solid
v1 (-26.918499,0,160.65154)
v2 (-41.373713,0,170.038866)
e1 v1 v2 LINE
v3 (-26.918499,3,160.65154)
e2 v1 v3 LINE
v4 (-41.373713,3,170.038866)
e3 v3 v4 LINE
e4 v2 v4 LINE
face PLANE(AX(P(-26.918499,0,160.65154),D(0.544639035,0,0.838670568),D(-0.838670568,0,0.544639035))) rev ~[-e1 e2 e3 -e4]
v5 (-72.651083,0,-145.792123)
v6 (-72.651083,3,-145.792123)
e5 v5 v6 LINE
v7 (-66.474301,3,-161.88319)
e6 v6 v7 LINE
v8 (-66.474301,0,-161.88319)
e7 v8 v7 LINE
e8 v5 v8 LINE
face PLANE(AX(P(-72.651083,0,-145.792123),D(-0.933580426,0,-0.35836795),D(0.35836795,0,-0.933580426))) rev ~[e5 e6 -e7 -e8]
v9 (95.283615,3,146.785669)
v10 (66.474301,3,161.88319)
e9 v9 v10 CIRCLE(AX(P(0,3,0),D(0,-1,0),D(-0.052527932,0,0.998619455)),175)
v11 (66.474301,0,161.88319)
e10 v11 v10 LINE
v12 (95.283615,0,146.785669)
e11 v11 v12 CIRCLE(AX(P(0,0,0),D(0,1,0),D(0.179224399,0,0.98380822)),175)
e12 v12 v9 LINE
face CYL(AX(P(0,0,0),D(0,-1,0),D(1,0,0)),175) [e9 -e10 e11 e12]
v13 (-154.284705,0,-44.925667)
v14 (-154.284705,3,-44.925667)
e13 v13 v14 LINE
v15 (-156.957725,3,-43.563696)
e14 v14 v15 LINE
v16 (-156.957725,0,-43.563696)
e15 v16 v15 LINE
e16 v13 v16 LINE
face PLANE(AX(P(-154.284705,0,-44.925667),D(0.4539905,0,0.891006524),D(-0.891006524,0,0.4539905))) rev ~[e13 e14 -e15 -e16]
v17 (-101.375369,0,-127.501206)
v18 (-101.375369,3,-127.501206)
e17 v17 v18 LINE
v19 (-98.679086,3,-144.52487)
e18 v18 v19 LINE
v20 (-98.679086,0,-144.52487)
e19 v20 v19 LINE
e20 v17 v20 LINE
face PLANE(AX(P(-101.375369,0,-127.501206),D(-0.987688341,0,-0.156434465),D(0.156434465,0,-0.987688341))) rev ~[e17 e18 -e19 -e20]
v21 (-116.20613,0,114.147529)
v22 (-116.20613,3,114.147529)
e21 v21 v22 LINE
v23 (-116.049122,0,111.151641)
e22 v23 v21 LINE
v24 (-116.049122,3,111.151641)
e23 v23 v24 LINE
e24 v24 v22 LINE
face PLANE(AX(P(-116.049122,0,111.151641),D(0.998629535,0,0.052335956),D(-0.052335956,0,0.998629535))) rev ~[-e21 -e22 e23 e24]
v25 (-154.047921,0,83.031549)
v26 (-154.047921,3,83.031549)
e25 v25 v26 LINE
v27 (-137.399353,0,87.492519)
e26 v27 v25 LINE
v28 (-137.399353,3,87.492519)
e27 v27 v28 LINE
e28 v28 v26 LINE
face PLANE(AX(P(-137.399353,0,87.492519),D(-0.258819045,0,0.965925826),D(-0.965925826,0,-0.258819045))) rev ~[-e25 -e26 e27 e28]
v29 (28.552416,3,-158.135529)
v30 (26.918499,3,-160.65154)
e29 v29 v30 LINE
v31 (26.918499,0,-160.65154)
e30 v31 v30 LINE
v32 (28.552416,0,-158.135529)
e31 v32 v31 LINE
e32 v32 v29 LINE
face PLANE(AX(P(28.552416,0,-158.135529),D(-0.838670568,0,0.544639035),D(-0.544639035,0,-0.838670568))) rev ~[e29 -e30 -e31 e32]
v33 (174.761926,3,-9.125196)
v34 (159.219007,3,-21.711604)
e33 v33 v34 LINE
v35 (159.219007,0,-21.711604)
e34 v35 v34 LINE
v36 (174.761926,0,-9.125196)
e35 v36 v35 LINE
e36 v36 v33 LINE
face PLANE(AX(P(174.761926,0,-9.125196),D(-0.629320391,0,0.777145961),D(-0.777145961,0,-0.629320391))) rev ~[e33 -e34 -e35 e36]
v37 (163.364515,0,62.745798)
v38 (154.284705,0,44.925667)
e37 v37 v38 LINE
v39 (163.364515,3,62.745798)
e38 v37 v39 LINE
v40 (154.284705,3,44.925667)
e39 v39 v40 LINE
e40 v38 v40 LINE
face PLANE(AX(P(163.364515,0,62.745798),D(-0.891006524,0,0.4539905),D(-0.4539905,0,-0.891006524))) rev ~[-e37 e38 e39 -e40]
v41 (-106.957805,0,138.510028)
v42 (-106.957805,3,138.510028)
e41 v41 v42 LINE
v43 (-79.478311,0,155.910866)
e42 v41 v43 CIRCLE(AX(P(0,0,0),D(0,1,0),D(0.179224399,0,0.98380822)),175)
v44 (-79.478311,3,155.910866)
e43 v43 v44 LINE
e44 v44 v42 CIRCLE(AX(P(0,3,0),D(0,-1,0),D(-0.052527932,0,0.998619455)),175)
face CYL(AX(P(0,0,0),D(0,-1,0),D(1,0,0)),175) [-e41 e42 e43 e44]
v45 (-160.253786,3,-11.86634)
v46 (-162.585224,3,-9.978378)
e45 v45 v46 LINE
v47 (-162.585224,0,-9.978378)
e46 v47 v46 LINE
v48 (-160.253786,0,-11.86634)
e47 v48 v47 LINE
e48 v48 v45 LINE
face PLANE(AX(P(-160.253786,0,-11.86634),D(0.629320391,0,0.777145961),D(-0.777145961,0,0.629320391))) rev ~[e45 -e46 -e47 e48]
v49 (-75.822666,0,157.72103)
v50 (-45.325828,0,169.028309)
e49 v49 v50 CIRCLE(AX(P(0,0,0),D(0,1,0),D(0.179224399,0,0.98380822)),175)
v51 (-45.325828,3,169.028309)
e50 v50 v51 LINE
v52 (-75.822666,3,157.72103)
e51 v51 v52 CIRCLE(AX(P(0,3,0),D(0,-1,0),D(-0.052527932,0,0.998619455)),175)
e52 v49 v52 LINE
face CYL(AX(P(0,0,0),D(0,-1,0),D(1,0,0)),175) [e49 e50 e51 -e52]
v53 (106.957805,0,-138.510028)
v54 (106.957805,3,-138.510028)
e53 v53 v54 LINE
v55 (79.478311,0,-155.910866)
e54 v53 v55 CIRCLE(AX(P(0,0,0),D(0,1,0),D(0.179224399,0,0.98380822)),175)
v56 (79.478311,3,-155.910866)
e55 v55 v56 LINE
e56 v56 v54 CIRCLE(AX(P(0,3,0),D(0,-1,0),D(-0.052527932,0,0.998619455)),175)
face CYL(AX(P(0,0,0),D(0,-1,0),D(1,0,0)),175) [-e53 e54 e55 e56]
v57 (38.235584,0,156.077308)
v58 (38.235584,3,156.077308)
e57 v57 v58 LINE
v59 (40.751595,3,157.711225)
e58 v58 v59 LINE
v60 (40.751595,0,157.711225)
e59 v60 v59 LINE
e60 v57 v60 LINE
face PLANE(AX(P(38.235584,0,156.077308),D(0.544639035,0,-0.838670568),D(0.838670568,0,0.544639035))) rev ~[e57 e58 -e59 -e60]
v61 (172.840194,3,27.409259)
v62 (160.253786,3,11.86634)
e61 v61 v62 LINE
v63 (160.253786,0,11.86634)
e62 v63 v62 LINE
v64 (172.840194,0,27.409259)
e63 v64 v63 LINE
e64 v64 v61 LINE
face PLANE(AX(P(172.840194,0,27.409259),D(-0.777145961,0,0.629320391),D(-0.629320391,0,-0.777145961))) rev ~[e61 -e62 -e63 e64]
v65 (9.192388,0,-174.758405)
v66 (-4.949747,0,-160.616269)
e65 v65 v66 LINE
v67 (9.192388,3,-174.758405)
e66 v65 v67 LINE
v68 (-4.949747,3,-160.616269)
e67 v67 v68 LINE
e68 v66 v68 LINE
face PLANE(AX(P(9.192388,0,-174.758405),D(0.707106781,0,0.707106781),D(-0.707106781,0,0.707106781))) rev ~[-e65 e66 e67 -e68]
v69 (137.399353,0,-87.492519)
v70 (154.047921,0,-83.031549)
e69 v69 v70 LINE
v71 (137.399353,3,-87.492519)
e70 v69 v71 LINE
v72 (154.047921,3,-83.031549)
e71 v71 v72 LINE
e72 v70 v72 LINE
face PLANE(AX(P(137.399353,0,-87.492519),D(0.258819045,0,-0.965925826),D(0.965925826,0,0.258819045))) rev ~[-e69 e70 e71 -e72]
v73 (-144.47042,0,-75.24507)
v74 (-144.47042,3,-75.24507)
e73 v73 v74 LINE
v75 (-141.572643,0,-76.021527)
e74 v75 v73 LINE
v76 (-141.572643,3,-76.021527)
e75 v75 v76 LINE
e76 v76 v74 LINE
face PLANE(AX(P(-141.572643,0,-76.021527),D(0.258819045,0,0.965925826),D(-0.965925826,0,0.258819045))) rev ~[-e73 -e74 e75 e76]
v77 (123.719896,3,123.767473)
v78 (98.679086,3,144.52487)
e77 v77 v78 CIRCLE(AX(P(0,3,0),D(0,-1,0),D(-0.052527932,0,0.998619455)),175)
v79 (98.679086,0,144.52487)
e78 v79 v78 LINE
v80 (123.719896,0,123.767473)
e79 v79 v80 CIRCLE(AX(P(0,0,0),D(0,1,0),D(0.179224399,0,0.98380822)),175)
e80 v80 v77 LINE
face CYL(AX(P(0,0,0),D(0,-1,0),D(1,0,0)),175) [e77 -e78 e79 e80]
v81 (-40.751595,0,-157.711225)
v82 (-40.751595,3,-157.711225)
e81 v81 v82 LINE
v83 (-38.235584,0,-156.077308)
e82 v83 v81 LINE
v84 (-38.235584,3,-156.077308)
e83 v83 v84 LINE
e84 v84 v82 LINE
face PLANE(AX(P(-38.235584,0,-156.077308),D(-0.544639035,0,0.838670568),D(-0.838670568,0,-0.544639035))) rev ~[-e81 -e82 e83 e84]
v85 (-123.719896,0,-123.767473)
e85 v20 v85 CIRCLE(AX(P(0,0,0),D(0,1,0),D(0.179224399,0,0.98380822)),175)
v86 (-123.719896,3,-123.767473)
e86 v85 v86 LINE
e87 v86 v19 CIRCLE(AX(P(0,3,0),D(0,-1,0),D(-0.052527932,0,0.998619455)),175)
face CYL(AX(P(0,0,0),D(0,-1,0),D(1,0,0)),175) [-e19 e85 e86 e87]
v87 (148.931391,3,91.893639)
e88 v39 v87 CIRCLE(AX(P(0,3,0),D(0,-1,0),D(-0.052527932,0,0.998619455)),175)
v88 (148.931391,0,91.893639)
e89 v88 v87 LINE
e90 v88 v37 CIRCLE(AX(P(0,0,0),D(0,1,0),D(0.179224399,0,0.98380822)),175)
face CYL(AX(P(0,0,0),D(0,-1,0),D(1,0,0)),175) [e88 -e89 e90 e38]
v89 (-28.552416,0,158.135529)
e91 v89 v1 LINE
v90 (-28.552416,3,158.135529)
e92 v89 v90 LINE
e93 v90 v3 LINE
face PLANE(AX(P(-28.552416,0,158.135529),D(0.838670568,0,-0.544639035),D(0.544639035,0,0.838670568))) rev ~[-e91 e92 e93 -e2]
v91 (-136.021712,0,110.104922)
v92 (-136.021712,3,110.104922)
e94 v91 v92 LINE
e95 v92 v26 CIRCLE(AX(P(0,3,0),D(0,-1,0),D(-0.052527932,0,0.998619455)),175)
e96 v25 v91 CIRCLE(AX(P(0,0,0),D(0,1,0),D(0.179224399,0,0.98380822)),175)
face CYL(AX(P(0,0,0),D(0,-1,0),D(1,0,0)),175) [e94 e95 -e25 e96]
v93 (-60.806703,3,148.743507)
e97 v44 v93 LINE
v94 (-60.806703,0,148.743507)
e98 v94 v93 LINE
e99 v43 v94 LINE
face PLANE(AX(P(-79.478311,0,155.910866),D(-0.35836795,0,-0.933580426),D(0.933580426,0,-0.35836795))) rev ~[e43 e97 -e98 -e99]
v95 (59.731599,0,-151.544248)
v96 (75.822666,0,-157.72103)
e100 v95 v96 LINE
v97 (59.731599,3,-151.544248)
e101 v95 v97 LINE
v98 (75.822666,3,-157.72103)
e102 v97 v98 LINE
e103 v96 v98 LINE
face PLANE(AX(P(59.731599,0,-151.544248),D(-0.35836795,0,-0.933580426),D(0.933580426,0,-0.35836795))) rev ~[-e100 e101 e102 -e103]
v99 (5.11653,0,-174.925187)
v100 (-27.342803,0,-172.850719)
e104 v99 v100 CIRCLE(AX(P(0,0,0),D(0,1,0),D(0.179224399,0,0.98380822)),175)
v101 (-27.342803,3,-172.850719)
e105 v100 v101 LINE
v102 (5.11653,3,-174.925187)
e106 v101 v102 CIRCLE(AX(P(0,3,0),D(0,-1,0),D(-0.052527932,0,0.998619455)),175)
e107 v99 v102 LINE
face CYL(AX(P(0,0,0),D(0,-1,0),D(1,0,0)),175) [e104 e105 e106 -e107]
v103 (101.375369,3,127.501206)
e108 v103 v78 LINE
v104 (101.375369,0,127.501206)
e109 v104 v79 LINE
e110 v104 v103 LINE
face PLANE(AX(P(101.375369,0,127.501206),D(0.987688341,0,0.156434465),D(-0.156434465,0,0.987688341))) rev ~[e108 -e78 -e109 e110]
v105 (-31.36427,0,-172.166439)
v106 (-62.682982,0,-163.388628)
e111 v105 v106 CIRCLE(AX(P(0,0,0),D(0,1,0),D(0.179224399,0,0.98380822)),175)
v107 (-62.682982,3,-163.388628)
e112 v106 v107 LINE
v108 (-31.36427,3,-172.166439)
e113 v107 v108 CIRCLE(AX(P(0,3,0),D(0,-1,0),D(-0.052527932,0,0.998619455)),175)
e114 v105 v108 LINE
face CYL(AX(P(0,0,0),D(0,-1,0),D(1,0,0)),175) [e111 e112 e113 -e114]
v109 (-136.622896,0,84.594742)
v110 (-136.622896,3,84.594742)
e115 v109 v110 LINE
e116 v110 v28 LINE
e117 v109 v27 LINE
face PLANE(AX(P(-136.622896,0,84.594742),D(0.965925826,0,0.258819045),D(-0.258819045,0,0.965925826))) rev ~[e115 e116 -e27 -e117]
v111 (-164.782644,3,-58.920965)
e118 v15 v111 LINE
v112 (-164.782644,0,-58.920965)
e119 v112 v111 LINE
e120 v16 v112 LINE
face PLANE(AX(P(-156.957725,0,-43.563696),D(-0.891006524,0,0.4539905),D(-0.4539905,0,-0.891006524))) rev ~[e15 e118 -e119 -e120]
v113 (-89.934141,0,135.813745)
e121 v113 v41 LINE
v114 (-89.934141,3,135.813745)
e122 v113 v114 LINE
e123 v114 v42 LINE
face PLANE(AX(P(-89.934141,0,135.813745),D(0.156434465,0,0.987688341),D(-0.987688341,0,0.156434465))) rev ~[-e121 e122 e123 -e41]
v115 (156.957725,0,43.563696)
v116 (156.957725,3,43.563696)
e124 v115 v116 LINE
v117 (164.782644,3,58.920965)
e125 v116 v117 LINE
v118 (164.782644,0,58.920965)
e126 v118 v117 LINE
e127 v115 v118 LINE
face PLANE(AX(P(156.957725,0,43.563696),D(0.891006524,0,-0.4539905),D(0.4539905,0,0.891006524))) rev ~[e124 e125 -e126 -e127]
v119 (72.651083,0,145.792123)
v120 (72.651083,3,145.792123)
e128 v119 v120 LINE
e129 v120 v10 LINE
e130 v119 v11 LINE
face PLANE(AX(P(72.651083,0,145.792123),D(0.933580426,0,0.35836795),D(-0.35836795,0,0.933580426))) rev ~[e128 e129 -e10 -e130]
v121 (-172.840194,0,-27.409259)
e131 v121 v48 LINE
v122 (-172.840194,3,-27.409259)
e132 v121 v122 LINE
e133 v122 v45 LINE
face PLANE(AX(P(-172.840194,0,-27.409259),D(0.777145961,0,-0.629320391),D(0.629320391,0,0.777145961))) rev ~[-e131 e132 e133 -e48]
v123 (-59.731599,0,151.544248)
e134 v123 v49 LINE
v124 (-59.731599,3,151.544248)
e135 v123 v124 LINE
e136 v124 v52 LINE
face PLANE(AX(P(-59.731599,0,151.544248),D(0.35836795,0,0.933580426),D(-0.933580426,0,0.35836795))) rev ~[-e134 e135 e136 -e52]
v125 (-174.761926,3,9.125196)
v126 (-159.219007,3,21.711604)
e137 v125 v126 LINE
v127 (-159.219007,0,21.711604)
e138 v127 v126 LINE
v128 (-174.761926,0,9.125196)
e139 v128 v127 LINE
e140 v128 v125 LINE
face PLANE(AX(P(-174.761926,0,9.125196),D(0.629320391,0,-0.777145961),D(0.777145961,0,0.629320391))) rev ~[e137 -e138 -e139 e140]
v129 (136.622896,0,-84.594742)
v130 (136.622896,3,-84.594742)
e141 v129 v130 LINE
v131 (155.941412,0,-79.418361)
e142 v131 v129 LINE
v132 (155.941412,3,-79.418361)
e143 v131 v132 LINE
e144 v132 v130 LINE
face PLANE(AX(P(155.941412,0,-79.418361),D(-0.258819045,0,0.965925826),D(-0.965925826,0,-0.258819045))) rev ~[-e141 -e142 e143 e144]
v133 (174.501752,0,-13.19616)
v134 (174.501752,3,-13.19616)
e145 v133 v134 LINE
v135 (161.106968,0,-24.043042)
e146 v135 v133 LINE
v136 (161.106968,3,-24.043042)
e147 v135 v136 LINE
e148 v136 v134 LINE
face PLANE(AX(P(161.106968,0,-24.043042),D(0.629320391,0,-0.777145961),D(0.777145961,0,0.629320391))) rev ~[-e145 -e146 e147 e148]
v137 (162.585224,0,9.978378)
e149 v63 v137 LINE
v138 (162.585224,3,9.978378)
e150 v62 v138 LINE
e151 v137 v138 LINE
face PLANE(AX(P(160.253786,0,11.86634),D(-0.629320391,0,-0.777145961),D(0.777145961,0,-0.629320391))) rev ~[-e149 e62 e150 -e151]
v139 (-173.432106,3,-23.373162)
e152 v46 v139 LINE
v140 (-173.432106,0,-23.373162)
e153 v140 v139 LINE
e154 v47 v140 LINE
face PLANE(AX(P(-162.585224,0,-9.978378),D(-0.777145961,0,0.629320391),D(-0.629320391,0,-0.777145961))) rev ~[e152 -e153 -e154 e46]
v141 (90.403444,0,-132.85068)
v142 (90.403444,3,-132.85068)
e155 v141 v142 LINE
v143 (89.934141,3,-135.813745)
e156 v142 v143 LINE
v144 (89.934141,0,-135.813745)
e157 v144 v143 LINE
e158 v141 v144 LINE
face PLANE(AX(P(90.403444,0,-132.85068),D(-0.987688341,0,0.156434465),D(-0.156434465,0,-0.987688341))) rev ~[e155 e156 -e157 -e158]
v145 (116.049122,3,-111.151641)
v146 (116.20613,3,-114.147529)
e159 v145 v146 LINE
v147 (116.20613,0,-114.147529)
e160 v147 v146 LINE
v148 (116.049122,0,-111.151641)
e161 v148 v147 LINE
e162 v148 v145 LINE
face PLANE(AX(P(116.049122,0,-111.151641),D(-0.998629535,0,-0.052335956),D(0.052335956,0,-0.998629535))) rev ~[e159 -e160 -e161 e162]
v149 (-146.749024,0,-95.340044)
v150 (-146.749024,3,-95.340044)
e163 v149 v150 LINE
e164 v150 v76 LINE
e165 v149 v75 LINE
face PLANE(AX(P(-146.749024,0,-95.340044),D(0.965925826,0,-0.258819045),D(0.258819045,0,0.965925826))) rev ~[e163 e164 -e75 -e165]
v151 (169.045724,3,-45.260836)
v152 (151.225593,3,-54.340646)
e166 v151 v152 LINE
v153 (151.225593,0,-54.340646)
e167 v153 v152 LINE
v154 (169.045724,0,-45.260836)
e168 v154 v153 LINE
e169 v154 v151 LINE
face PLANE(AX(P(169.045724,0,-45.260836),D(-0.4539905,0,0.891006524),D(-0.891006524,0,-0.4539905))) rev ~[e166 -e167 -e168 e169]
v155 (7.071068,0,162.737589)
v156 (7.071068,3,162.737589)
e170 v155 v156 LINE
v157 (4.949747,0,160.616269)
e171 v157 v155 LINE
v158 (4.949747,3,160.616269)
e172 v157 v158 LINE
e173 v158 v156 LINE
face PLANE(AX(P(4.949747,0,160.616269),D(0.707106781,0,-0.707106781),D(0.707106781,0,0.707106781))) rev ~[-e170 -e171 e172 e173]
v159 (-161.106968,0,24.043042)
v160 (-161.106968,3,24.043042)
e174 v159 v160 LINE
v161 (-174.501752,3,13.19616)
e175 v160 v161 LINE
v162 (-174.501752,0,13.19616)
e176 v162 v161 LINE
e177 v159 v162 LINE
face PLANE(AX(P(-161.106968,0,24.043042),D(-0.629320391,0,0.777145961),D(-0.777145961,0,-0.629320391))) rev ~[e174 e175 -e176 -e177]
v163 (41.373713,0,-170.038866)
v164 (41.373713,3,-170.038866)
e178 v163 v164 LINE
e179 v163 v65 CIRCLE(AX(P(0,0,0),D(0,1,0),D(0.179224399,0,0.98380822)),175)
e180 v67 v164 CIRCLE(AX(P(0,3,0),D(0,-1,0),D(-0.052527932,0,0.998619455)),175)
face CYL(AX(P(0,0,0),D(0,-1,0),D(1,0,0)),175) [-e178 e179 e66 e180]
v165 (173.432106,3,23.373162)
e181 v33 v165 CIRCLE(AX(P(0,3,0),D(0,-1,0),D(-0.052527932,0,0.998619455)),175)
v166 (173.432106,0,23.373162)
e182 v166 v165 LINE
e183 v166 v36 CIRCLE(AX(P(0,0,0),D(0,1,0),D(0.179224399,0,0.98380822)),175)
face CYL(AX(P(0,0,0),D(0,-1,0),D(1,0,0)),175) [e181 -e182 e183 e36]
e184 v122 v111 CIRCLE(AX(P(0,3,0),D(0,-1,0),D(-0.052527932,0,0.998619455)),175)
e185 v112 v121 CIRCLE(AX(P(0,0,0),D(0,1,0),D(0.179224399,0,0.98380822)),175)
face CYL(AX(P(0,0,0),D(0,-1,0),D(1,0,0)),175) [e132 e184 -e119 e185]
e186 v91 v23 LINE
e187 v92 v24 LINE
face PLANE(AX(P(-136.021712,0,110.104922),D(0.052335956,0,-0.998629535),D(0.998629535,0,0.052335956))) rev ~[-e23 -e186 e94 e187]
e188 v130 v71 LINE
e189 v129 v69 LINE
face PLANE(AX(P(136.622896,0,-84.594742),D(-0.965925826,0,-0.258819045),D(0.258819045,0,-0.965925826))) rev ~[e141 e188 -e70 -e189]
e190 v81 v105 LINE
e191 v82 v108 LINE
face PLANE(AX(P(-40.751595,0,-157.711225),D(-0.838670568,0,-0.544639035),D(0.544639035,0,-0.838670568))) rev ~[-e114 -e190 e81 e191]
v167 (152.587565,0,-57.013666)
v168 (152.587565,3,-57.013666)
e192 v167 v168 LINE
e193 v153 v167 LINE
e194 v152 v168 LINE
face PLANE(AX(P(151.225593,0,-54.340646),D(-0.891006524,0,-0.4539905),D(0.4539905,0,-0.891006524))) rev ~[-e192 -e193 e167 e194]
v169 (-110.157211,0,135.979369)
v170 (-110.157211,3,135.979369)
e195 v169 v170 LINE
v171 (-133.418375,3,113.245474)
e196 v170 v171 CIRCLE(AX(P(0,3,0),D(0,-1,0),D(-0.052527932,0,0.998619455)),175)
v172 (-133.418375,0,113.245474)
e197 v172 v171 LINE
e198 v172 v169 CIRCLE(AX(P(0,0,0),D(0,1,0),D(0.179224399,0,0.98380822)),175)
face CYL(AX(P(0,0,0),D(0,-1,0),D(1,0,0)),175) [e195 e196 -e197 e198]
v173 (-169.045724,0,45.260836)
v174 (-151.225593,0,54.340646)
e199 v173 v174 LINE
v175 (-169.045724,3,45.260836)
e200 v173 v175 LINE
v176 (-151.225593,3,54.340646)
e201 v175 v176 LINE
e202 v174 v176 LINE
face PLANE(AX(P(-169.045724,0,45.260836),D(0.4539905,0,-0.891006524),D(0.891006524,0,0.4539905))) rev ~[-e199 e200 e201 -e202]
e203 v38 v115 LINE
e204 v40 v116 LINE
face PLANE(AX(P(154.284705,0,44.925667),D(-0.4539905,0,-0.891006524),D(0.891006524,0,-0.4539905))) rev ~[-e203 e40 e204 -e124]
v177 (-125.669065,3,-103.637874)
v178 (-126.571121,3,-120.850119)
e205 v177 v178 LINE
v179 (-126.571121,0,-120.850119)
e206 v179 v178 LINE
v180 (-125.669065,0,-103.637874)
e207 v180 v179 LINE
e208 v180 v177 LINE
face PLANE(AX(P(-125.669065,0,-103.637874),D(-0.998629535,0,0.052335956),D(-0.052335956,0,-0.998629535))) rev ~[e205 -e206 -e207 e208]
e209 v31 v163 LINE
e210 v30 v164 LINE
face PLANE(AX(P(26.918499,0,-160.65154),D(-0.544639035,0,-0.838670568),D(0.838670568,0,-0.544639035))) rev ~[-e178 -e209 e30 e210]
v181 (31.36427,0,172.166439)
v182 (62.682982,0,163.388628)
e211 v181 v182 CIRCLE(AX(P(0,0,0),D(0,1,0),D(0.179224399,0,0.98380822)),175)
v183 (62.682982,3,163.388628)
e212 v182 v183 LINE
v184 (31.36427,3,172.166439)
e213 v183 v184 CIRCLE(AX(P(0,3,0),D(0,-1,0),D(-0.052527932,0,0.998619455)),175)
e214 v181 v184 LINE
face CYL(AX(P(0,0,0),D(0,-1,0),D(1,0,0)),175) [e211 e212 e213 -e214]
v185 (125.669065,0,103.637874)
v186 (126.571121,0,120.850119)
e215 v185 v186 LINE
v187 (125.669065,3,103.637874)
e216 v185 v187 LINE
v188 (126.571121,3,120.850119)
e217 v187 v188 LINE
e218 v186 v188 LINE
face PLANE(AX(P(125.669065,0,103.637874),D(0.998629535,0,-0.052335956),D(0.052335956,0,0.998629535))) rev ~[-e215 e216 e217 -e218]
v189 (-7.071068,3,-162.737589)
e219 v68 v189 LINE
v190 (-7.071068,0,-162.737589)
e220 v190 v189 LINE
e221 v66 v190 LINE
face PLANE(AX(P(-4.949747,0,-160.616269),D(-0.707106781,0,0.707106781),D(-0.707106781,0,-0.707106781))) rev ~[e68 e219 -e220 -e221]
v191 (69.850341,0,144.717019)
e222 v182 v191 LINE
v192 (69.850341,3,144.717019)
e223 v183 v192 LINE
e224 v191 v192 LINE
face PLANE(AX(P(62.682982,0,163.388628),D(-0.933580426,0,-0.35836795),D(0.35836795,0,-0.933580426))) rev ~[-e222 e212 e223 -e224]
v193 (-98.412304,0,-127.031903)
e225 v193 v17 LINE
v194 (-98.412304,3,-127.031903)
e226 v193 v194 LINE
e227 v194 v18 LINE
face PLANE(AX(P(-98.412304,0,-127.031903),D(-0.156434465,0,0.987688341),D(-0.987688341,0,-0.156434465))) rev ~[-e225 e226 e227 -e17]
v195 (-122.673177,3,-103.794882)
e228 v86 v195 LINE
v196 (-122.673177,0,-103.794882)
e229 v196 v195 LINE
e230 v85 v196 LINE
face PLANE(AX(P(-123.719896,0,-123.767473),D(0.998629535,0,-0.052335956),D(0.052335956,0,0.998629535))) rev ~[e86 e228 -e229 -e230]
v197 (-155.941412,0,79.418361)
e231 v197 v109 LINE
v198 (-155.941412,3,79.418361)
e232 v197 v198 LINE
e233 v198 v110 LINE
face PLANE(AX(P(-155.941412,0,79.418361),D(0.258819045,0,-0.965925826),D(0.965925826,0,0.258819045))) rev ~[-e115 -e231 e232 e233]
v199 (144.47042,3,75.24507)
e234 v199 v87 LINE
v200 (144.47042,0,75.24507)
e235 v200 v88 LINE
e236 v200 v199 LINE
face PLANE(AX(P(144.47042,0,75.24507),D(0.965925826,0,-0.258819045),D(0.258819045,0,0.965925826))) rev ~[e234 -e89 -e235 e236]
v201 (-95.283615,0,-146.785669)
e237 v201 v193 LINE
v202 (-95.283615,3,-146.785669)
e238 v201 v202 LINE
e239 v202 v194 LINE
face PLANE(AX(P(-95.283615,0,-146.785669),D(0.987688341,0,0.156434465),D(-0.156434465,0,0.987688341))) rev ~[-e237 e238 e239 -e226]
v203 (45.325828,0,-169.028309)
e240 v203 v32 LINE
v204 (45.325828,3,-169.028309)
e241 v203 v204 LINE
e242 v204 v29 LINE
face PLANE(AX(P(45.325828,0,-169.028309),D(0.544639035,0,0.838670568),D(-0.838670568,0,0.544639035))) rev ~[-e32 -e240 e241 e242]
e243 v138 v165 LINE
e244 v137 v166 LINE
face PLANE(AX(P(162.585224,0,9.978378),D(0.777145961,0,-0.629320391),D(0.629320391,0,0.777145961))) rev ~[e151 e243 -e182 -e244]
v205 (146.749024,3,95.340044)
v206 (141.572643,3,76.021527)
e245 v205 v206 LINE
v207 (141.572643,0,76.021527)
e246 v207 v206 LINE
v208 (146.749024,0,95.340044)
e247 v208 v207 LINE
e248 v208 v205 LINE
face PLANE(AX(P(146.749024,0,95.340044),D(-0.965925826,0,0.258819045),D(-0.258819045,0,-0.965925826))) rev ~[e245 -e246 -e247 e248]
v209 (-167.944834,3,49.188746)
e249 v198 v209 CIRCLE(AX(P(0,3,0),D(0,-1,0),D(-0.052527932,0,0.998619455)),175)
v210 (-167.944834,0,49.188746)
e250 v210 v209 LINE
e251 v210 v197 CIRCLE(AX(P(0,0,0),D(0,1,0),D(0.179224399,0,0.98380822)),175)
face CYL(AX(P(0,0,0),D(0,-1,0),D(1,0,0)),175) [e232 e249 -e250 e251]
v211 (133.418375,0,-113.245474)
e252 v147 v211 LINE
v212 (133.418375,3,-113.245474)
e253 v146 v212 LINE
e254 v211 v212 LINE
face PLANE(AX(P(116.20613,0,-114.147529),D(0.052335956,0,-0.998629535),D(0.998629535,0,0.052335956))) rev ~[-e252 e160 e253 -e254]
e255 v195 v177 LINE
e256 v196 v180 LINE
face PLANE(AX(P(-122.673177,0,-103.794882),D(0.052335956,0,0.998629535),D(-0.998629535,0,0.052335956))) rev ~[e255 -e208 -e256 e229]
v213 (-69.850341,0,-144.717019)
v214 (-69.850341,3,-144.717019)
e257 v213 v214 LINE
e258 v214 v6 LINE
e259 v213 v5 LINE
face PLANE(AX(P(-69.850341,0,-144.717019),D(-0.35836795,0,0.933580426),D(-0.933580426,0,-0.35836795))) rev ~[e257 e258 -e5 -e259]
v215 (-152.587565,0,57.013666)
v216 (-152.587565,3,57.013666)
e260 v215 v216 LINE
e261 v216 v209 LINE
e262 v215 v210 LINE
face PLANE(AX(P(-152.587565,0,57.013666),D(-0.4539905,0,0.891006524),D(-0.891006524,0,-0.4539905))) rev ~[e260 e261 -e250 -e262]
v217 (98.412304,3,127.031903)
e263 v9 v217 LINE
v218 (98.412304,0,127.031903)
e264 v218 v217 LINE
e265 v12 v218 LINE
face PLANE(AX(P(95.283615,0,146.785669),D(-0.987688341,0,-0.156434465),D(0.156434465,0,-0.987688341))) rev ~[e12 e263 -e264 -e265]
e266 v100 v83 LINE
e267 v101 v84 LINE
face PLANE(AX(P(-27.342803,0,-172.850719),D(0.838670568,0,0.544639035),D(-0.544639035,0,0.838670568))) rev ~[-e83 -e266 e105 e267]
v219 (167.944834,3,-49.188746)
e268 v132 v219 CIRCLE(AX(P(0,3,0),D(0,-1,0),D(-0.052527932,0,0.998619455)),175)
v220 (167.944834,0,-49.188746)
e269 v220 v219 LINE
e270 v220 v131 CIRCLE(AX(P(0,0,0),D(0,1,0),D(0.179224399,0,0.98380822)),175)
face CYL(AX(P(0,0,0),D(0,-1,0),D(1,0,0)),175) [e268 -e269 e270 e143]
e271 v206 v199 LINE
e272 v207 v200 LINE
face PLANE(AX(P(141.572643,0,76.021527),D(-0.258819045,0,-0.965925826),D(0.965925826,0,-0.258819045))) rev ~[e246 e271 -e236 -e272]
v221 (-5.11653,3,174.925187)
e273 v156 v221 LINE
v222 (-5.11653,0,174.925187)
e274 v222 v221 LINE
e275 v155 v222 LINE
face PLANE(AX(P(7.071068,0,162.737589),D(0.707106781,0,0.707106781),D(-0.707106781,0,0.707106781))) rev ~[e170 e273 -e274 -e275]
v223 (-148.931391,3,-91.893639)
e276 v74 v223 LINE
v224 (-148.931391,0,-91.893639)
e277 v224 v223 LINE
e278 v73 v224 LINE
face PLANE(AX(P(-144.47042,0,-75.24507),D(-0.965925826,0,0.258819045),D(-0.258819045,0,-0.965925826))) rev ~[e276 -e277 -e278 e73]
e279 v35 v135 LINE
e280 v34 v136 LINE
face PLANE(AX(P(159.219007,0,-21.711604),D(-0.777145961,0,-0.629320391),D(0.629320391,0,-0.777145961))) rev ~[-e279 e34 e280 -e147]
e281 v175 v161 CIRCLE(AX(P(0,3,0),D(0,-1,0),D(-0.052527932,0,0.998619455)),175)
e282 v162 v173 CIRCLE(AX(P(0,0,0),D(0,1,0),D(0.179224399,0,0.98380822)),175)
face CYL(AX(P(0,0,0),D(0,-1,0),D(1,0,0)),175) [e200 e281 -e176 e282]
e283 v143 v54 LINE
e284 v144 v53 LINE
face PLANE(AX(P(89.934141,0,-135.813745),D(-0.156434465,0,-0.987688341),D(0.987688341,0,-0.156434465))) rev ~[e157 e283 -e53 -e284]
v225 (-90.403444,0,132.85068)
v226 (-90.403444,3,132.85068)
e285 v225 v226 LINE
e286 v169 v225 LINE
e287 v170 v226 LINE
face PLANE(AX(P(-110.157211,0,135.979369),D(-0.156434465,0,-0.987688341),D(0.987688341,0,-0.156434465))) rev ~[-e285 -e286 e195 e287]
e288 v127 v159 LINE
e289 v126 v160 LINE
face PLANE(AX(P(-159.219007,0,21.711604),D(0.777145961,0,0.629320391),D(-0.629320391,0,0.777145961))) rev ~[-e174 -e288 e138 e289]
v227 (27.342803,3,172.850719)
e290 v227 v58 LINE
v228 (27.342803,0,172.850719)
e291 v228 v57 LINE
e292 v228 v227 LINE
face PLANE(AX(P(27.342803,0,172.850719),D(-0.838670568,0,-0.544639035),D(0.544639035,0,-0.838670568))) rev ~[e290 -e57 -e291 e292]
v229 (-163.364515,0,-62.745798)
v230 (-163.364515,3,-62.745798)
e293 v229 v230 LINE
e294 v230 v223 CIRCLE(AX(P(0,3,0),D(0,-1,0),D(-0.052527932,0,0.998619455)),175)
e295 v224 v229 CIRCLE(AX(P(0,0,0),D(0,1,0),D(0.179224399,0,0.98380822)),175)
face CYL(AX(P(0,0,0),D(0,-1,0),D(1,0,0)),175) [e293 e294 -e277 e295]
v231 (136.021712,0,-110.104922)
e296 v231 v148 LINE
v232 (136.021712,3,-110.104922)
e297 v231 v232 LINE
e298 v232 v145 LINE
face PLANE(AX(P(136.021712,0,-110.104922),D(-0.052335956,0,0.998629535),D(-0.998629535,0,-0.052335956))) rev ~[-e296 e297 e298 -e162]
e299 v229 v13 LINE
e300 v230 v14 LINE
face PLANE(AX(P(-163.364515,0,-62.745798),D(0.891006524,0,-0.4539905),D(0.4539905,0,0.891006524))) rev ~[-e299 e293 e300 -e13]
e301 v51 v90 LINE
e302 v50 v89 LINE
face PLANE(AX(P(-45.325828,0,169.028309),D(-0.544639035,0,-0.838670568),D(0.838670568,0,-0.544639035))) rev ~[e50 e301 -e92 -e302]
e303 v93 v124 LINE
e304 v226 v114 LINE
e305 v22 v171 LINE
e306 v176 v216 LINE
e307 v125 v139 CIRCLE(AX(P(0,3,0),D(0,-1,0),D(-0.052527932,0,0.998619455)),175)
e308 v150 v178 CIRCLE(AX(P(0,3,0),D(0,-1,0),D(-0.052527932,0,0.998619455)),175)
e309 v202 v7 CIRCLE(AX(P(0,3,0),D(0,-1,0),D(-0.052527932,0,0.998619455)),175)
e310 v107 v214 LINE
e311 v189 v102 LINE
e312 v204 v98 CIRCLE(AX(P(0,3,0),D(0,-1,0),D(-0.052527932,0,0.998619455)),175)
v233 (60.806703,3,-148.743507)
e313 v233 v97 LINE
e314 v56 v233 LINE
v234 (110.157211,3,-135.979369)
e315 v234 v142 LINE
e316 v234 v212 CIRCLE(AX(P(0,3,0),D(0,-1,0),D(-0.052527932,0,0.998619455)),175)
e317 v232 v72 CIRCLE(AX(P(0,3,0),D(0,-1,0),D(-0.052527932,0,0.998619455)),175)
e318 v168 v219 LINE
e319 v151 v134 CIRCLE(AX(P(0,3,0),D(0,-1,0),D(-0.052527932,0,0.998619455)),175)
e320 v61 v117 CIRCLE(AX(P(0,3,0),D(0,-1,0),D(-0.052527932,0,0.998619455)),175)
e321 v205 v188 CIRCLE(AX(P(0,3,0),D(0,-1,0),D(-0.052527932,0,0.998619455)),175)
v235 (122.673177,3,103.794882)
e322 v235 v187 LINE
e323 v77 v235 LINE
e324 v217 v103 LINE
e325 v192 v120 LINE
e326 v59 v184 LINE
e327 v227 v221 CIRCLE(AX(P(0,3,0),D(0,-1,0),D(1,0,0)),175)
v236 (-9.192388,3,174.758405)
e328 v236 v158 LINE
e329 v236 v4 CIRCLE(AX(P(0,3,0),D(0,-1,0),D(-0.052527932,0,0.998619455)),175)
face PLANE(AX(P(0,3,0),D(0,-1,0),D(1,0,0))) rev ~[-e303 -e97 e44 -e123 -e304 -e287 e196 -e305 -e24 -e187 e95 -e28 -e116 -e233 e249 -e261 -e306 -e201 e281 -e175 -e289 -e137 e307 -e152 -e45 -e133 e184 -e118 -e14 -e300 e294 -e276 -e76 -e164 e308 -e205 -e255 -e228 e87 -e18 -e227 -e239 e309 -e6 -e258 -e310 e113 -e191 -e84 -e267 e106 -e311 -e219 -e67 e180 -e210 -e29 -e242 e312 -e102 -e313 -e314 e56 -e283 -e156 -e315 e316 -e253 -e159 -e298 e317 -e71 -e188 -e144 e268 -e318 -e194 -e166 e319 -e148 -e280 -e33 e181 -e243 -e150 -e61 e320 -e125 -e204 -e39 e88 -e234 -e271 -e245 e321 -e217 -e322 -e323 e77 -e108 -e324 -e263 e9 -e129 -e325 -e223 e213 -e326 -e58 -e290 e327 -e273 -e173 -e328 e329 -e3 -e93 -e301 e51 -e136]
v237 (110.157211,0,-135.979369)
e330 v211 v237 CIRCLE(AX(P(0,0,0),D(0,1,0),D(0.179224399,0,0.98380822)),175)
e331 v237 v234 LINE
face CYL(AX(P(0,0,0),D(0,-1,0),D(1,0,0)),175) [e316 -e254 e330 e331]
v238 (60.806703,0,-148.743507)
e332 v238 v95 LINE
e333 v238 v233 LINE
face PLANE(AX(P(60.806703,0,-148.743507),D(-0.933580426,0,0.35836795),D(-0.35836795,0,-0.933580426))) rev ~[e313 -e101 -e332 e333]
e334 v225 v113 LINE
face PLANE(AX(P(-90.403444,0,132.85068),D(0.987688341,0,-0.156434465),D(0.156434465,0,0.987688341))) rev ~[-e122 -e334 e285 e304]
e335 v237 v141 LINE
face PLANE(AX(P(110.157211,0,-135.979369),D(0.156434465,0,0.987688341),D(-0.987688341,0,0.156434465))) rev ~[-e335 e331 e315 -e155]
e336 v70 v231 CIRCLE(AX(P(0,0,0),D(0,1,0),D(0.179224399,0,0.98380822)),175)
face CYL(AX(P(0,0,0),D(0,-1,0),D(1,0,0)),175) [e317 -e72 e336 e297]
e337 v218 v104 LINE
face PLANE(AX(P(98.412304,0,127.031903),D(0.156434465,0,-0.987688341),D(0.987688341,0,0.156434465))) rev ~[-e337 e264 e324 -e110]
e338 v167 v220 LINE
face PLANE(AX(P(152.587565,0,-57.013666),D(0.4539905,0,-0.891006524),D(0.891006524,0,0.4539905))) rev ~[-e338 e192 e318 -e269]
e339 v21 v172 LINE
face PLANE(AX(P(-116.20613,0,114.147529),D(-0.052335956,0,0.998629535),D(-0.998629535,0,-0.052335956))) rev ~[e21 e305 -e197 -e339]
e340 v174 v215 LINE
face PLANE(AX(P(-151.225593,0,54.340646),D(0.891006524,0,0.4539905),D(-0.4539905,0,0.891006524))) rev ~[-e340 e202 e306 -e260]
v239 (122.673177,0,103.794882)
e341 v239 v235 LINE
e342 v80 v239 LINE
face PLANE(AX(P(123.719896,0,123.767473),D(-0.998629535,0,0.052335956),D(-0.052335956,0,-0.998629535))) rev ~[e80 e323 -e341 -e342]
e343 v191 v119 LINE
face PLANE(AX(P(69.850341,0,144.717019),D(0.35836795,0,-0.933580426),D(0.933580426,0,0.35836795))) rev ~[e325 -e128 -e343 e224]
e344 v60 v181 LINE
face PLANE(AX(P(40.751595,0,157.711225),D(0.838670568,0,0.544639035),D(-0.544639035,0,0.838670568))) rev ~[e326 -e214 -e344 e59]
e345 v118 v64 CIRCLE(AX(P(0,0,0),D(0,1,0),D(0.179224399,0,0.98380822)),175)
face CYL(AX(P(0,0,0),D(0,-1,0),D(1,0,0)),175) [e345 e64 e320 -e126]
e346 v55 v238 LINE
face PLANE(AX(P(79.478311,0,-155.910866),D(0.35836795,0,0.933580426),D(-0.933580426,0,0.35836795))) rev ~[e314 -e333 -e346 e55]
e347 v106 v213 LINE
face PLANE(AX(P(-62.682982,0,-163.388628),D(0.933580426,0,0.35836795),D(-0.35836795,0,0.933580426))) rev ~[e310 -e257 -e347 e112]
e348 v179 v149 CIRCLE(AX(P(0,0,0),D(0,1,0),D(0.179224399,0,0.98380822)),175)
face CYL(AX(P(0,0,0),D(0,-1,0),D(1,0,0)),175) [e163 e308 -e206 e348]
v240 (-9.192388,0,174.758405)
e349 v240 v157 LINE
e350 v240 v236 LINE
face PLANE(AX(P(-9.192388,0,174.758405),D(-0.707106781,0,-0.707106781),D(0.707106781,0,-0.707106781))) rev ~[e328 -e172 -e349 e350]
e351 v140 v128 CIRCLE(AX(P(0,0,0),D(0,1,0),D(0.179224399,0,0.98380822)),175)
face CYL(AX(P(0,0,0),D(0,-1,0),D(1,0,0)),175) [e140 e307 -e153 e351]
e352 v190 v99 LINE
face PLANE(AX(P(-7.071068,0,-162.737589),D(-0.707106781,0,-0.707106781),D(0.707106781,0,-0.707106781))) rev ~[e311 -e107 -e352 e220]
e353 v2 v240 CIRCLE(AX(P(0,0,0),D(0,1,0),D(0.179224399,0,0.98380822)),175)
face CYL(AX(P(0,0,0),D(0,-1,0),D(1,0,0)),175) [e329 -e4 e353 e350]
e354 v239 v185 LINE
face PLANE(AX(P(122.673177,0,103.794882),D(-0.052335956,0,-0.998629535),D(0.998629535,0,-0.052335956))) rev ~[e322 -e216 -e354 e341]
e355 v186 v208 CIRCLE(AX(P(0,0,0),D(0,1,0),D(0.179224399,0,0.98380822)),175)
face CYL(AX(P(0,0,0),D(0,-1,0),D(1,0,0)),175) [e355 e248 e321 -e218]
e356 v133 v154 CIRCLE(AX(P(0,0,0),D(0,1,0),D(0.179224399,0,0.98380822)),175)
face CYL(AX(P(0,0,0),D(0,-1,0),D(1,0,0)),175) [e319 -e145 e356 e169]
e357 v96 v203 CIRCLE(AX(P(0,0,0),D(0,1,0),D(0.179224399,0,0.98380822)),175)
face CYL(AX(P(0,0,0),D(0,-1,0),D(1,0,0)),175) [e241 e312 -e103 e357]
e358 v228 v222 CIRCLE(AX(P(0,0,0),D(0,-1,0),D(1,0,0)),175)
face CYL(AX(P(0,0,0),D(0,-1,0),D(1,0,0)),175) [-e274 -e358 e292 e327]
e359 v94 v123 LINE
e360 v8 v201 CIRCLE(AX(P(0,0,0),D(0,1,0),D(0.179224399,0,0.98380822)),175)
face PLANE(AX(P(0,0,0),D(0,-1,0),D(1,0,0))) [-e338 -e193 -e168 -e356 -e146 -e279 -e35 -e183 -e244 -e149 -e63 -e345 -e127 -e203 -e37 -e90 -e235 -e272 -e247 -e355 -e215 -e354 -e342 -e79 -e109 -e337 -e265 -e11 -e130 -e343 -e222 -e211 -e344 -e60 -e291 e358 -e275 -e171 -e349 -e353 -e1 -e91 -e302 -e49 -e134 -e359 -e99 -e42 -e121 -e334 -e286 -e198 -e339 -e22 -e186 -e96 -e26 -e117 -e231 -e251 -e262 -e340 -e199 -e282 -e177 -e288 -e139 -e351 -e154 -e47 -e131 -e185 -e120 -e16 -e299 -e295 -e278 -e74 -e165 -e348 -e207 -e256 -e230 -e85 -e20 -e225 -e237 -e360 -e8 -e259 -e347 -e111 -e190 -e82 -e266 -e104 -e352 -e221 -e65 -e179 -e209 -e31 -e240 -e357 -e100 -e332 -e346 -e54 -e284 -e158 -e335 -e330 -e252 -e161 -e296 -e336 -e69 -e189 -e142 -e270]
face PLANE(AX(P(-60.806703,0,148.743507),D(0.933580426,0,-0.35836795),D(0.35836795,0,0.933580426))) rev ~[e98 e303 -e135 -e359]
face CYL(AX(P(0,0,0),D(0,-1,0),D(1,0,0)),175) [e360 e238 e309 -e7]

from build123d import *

# Parameters (mm, degrees)
F0_R            = 175
F1_DEPTH        = 3
F3_DEPTH        = 3.001
F3_COPIES_COUNT = 30


# Not quite as in the source:
# - a pattern or mirror of a feature is missing from the dataset's text; its kind, count and spacing are read off the source's solid


with BuildPart() as f1:
    # F0 (on Front) → F1 (new body)
    with BuildSketch(Plane.XZ):
        Circle(F0_R)
    extrude(amount=-F1_DEPTH)

    # F2 (on face) → F3 (cut, through all)
    with BuildSketch(Plane.XZ):
        with BuildLine():
            ThreePointArc((-5.1165300167, 174.9251872104), (-7.1549450675, 174.8536724266), (-9.1923881554, 174.758404662))
            Line((-9.1923881554, 174.758404662), (4.9497474683, 160.6162690382))
            Line((4.9497474683, 160.6162690382), (7.0710678119, 162.7375893818))
            Line((7.0710678119, 162.7375893818), (-5.1165300167, 174.9251872104))
        make_face()
    f3 = extrude(amount=-F3_DEPTH, mode=Mode.SUBTRACT)

    # F3_copies: F3 ×30 about axis
    f3_copies_axis = Axis((0, 0, 0), (0, 1, 0))
    for i in range(1, F3_COPIES_COUNT):
        add(f3.rotate(f3_copies_axis, i * 360 / F3_COPIES_COUNT), mode=Mode.SUBTRACT)


solid = f1.part
